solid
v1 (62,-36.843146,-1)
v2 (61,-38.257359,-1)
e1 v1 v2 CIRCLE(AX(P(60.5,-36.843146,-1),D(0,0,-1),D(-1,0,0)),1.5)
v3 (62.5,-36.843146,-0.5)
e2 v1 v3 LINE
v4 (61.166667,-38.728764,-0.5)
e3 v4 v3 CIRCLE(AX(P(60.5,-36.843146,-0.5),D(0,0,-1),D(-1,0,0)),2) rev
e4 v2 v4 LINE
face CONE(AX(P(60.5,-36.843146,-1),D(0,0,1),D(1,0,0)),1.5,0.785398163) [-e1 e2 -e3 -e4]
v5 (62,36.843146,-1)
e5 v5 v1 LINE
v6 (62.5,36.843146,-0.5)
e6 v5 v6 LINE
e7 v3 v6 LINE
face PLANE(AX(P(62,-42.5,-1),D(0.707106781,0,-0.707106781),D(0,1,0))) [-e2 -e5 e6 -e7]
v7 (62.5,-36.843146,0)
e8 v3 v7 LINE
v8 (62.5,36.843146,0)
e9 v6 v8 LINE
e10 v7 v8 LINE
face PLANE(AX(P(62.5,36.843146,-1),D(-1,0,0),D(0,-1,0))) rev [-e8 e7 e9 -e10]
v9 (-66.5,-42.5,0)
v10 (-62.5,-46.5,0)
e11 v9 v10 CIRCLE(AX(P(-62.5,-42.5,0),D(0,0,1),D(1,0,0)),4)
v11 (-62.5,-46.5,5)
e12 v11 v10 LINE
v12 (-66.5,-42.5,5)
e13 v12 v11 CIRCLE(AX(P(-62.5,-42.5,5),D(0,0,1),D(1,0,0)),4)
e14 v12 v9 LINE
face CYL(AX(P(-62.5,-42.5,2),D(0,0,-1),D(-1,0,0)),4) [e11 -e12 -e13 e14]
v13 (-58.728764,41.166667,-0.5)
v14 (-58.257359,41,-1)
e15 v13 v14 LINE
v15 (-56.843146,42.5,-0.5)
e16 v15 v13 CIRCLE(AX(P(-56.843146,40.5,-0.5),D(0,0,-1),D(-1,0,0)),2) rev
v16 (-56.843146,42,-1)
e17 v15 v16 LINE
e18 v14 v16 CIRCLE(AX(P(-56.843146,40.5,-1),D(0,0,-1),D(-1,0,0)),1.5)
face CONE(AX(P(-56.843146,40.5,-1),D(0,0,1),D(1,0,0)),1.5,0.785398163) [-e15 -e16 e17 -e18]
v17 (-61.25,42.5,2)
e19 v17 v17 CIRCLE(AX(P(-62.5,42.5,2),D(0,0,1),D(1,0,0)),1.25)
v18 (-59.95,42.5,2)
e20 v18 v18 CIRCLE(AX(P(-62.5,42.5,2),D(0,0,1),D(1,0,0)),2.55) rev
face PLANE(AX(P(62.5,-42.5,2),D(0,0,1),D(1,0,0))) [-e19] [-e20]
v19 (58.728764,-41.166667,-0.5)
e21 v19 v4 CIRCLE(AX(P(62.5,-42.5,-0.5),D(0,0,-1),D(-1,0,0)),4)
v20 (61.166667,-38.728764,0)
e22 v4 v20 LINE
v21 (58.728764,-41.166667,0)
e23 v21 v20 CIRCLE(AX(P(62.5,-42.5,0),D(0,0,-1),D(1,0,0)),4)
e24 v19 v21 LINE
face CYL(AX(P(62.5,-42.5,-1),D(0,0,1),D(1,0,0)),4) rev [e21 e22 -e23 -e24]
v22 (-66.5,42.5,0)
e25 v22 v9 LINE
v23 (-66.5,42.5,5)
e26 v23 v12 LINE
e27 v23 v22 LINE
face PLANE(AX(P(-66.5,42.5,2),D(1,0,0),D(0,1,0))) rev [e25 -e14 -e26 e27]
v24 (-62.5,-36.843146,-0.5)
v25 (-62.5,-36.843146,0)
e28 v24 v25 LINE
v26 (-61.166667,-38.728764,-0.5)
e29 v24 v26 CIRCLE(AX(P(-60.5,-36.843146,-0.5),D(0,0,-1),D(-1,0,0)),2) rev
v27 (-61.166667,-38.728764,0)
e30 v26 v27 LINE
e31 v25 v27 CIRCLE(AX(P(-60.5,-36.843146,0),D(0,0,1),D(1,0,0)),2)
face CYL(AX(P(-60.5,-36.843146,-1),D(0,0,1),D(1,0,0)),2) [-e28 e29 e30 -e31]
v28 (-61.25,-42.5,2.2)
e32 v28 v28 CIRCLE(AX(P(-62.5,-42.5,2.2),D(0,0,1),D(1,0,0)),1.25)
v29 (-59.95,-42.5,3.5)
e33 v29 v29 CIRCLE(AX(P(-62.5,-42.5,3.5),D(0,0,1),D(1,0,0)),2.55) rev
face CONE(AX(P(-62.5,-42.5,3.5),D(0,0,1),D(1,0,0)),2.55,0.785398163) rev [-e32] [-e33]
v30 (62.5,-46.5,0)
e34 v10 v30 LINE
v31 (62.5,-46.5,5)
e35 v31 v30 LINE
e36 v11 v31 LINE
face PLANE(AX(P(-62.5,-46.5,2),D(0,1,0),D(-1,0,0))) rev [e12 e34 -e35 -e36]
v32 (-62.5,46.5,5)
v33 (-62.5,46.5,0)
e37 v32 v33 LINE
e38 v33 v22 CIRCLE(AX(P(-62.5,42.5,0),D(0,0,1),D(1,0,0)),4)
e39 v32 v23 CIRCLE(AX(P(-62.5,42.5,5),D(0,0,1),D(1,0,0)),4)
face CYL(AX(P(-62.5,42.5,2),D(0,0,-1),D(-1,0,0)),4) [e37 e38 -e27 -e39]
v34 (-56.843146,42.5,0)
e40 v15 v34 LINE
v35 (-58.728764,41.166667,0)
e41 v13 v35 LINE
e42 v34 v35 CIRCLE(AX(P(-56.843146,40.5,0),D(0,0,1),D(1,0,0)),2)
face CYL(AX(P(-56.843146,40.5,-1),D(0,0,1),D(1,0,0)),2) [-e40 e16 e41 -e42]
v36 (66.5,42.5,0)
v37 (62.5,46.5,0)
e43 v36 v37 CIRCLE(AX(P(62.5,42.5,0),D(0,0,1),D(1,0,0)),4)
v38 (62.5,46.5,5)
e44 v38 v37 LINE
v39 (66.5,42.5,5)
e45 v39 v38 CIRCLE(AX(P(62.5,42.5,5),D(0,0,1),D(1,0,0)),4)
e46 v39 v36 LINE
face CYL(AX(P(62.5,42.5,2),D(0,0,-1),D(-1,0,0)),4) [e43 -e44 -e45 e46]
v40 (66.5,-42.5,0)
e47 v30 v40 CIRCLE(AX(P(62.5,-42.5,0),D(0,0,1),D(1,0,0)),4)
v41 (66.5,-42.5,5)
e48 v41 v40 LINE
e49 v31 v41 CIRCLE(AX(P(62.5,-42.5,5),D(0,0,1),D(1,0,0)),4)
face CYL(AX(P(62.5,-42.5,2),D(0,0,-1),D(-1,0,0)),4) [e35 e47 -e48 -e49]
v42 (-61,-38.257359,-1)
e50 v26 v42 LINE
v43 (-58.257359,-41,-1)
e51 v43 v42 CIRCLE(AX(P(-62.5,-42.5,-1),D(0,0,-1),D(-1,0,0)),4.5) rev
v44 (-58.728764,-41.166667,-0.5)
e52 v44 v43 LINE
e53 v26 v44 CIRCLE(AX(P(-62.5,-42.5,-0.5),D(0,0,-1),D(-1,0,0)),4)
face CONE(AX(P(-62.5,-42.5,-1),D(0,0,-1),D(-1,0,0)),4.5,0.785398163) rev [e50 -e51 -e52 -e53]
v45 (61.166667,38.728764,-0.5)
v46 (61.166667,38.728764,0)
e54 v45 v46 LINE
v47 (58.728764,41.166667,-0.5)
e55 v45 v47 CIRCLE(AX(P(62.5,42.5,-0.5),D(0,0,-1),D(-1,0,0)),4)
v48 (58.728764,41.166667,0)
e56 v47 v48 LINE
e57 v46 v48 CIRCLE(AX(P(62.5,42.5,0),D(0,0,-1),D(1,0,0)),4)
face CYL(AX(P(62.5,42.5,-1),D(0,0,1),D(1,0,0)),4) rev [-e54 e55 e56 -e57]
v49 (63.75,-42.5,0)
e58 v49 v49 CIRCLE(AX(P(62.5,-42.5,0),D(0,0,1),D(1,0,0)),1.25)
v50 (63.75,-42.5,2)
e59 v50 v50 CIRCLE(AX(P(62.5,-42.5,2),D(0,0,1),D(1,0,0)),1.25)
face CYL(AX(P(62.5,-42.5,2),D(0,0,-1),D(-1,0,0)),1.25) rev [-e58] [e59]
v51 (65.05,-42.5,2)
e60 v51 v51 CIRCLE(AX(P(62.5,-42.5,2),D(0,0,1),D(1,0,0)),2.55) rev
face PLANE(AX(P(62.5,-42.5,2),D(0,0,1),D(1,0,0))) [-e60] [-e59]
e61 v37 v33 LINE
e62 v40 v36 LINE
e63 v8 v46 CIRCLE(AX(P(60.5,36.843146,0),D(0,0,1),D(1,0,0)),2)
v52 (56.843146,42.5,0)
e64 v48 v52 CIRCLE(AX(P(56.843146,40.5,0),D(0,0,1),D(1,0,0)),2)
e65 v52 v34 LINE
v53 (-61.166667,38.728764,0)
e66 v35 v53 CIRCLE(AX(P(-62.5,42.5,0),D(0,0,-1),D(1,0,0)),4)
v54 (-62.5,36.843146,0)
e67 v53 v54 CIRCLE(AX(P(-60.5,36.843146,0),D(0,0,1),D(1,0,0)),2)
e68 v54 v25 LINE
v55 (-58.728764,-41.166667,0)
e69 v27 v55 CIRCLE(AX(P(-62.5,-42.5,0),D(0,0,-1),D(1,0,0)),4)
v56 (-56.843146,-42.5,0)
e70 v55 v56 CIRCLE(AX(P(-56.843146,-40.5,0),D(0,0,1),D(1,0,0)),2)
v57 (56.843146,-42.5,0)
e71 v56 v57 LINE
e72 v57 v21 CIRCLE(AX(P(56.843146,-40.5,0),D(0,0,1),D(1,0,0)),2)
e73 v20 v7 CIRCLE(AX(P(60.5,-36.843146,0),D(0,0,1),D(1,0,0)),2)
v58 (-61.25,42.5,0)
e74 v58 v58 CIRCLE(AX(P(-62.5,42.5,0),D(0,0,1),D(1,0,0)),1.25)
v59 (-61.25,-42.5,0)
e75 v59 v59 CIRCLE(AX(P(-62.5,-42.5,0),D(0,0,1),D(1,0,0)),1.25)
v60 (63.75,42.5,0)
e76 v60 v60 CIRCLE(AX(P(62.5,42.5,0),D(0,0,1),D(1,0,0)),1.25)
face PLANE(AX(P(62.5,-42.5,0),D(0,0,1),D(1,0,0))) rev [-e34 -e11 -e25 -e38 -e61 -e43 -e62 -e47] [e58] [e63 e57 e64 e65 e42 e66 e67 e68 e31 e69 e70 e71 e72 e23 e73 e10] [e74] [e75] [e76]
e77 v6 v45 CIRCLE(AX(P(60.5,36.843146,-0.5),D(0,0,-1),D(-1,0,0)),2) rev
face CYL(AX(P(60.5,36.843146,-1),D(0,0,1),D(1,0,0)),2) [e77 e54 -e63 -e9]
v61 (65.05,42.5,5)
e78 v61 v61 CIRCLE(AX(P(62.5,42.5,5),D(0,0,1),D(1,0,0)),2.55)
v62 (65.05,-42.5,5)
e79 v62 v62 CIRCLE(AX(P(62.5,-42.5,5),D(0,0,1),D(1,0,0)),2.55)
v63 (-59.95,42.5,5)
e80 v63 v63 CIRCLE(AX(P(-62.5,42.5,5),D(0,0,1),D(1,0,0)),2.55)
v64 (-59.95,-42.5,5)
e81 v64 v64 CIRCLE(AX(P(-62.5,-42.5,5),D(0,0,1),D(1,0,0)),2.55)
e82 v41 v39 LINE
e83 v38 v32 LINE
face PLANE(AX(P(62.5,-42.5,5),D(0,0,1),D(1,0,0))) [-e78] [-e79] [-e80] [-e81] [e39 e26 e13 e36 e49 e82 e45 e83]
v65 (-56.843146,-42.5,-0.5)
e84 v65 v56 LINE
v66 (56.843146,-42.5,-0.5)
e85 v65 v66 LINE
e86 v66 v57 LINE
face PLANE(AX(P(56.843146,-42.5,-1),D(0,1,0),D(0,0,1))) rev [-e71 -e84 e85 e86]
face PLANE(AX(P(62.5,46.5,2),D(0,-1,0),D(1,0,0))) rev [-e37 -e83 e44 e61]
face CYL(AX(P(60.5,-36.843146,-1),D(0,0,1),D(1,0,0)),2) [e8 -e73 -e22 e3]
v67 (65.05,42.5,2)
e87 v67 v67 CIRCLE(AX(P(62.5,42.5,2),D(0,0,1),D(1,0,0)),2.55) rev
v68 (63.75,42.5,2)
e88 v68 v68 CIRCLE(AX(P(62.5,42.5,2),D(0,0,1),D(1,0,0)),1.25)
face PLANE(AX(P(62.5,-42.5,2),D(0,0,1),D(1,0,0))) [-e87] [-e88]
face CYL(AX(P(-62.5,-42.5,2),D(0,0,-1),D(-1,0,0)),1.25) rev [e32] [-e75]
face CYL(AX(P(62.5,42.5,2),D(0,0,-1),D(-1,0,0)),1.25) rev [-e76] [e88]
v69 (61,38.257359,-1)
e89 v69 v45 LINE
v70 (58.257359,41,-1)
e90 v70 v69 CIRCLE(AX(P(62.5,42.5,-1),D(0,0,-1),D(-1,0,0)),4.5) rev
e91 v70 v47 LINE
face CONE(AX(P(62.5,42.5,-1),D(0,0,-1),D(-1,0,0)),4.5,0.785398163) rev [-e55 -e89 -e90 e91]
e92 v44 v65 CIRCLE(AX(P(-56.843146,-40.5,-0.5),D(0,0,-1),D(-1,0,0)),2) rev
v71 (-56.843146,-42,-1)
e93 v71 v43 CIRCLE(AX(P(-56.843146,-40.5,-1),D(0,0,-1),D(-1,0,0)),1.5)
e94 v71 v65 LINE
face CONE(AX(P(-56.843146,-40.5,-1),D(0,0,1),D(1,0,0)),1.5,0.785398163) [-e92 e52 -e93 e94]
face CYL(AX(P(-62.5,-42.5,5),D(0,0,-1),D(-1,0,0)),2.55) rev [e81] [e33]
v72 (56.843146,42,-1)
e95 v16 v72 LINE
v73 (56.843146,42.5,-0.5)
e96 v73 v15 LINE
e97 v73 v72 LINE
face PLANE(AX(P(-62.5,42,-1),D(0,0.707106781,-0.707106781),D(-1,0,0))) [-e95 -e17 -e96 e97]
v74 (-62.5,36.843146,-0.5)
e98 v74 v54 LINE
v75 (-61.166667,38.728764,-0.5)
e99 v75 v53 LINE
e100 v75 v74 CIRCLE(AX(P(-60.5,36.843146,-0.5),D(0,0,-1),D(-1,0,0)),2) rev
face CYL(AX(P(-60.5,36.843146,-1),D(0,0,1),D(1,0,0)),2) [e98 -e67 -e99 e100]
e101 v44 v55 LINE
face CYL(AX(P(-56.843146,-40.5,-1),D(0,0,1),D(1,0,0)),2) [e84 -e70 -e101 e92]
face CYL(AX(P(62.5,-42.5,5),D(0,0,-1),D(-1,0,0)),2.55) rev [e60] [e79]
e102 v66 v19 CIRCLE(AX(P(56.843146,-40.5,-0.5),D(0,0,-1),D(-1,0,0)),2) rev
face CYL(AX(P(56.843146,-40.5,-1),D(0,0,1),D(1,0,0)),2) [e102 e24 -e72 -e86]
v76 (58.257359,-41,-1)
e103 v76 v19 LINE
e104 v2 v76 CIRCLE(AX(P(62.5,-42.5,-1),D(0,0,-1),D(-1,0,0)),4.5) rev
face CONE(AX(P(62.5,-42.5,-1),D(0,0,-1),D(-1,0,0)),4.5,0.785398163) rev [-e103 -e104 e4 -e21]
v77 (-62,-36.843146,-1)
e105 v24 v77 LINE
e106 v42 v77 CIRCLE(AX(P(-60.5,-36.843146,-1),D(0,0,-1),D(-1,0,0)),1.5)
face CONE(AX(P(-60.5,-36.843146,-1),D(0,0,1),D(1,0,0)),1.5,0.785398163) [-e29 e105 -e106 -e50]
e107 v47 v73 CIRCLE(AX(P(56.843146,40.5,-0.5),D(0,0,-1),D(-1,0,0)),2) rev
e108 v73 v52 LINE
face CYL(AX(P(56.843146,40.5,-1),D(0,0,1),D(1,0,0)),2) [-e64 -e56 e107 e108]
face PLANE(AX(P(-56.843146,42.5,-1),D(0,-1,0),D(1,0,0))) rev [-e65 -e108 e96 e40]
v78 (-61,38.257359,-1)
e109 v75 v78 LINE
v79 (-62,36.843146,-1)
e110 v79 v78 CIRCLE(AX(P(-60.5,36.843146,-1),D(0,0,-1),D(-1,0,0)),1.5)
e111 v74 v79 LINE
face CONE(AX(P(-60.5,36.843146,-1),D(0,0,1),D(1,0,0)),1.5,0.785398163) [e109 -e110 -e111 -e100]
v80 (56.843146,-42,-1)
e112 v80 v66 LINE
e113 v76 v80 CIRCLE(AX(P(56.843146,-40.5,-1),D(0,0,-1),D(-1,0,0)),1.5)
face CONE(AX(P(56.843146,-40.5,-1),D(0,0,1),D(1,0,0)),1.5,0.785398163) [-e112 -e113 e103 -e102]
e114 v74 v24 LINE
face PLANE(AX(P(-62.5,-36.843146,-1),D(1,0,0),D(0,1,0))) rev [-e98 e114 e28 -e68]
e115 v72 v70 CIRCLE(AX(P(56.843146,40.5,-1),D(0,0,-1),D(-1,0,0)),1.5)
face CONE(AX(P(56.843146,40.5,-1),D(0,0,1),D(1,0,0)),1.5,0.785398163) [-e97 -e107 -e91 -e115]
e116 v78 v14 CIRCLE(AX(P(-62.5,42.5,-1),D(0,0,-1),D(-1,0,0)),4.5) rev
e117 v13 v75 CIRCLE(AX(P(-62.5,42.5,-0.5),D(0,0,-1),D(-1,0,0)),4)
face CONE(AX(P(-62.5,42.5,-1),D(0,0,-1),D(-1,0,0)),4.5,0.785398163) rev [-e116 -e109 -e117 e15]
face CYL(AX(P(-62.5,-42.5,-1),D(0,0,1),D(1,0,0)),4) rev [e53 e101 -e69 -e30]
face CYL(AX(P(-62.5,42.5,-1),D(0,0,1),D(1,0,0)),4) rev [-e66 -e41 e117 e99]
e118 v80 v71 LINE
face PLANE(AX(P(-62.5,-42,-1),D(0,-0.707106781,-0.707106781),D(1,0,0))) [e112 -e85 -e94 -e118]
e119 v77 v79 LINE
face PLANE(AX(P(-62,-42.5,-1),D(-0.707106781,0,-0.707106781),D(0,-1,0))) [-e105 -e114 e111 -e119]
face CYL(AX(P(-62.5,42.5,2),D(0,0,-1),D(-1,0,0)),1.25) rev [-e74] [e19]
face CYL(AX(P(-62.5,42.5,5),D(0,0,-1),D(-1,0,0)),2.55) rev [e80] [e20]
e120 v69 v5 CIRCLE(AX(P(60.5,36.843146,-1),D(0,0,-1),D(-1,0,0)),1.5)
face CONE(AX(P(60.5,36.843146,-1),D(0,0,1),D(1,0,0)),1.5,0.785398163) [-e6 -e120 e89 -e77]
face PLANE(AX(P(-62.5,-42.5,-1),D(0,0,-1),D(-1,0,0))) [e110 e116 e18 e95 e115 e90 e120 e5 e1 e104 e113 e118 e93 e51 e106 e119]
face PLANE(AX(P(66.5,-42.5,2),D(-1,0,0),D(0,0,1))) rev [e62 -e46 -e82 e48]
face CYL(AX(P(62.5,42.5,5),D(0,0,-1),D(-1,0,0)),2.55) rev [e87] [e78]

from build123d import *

# Parameters (mm, degrees)
SKETCH2_R           = 1.25
BOSS_EXTRUDE1_DEPTH = 2
SKETCH3_R           = 2.55
BOSS_EXTRUDE2_DEPTH = 3
BOSS_EXTRUDE3_START = 3
BOSS_EXTRUDE3_DEPTH = 3
CHAMFER1_SIZE       = 0.5
CHAMFER2_SIZE       = 1.5


with BuildPart() as part:
    # Sketch2 → Boss-Extrude1 (new body)
    with BuildSketch(Plane.XY):
        with BuildLine():
            Line((66.5, -42.5), (66.5, 42.5))
            ThreePointArc((66.5, 42.5), (65.328427125, 45.328427125), (62.5, 46.5))
            Line((62.5, 46.5), (-62.5, 46.5))
            ThreePointArc((-62.5, 46.5), (-65.328427125, 45.328427125), (-66.5, 42.5))
            Line((-66.5, 42.5), (-66.5, -42.5))
            ThreePointArc((-66.5, -42.5), (-65.328427125, -45.328427125), (-62.5, -46.5))
            Line((-62.5, -46.5), (62.5, -46.5))
            ThreePointArc((62.5, -46.5), (65.328427125, -45.328427125), (66.5, -42.5))
        make_face()
        with Locations((-62.5, 42.5)):
            Circle(SKETCH2_R, mode=Mode.SUBTRACT)
        with Locations((62.5, 42.5)):
            Circle(SKETCH2_R, mode=Mode.SUBTRACT)
        with Locations((-62.5, -42.5)):
            Circle(SKETCH2_R, mode=Mode.SUBTRACT)
        with Locations((62.5, -42.5)):
            Circle(SKETCH2_R, mode=Mode.SUBTRACT)
        with BuildLine():
            Line((-62.5, -36.843145751), (-62.5, 36.843145751))
            ThreePointArc((-62.5, 36.843145751), (-62.132993162, 37.997846289), (-61.166666667, 38.728763834))
            ThreePointArc((-61.166666667, 38.728763834), (-59.671572875, 39.671572875), (-58.728763834, 41.166666667))
            ThreePointArc((-58.728763834, 41.166666667), (-57.997846289, 42.132993162), (-56.843145751, 42.5))
            Line((-56.843145751, 42.5), (56.843145751, 42.5))
            ThreePointArc((56.843145751, 42.5), (57.997846289, 42.132993162), (58.728763834, 41.166666667))
            ThreePointArc((58.728763834, 41.166666667), (59.671572875, 39.671572875), (61.166666667, 38.728763834))
            ThreePointArc((61.166666667, 38.728763834), (62.132993162, 37.997846289), (62.5, 36.843145751))
            Line((62.5, 36.843145751), (62.5, -36.843145751))
            ThreePointArc((62.5, -36.843145751), (62.132993162, -37.997846289), (61.166666667, -38.728763834))
            ThreePointArc((61.166666667, -38.728763834), (59.671572875, -39.671572875), (58.728763834, -41.166666667))
            ThreePointArc((58.728763834, -41.166666667), (57.997846289, -42.132993162), (56.843145751, -42.5))
            Line((56.843145751, -42.5), (-56.843145751, -42.5))
            ThreePointArc((-56.843145751, -42.5), (-57.997846289, -42.132993162), (-58.728763834, -41.166666667))
            ThreePointArc((-58.728763834, -41.166666667), (-59.671572875, -39.671572875), (-61.166666667, -38.728763834))
            ThreePointArc((-61.166666667, -38.728763834), (-62.132993162, -37.997846289), (-62.5, -36.843145751))
        make_face(mode=Mode.SUBTRACT)
    extrude(amount=BOSS_EXTRUDE1_DEPTH)

    # Sketch3 → Boss-Extrude2 (add)
    with BuildSketch(Plane.XY.offset(2)):
        with BuildLine():
            Line((66.5, -42.5), (66.5, 42.5))
            ThreePointArc((66.5, 42.5), (65.328427125, 45.328427125), (62.5, 46.5))
            Line((62.5, 46.5), (-62.5, 46.5))
            ThreePointArc((-62.5, 46.5), (-65.328427125, 45.328427125), (-66.5, 42.5))
            Line((-66.5, 42.5), (-66.5, -42.5))
            ThreePointArc((-66.5, -42.5), (-65.328427125, -45.328427125), (-62.5, -46.5))
            Line((-62.5, -46.5), (62.5, -46.5))
            ThreePointArc((62.5, -46.5), (65.328427125, -45.328427125), (66.5, -42.5))
        make_face()
        with Locations((-62.5, 42.5)):
            Circle(SKETCH3_R, mode=Mode.SUBTRACT)
        with Locations((62.5, 42.5)):
            Circle(SKETCH3_R, mode=Mode.SUBTRACT)
        with Locations((62.5, -42.5)):
            Circle(SKETCH3_R, mode=Mode.SUBTRACT)
        with Locations((-62.5, -42.5)):
            Circle(SKETCH3_R, mode=Mode.SUBTRACT)
    extrude(amount=BOSS_EXTRUDE2_DEPTH)

    # Sketch4 → Boss-Extrude3 (add)
    with BuildSketch(Plane(origin=(0, 0, 2), x_dir=(-1, 0, 0), z_dir=(0, 0, -1)).offset(BOSS_EXTRUDE3_START)):
        with BuildLine():
            Line((62.5, -36.843145751), (62.5, 36.843145751))
            ThreePointArc((62.5, 36.843145751), (62.132993162, 37.997846289), (61.166666667, 38.728763834))
            ThreePointArc((61.166666667, 38.728763834), (59.671572875, 39.671572875), (58.728763834, 41.166666667))
            ThreePointArc((58.728763834, 41.166666667), (57.997846289, 42.132993162), (56.843145751, 42.5))
            Line((56.843145751, 42.5), (-56.843145751, 42.5))
            ThreePointArc((-56.843145751, 42.5), (-57.997846289, 42.132993162), (-58.728763834, 41.166666667))
            ThreePointArc((-58.728763834, 41.166666667), (-59.671572875, 39.671572875), (-61.166666667, 38.728763834))
            ThreePointArc((-61.166666667, 38.728763834), (-62.132993162, 37.997846289), (-62.5, 36.843145751))
            Line((-62.5, 36.843145751), (-62.5, -36.843145751))
            ThreePointArc((-62.5, -36.843145751), (-62.132993162, -37.997846289), (-61.166666667, -38.728763834))
            ThreePointArc((-61.166666667, -38.728763834), (-59.671572875, -39.671572875), (-58.728763834, -41.166666667))
            ThreePointArc((-58.728763834, -41.166666667), (-57.997846289, -42.132993162), (-56.843145751, -42.5))
            Line((-56.843145751, -42.5), (56.843145751, -42.5))
            ThreePointArc((56.843145751, -42.5), (57.997846289, -42.132993162), (58.728763834, -41.166666667))
            ThreePointArc((58.728763834, -41.166666667), (59.671572875, -39.671572875), (61.166666667, -38.728763834))
            ThreePointArc((61.166666667, -38.728763834), (62.132993162, -37.997846289), (62.5, -36.843145751))
        make_face()
    extrude(amount=-BOSS_EXTRUDE3_DEPTH)

    # Chamfer1
    chamfer1_edges = [part.edges().sort_by_distance(p)[0] for p in [
        (-59.671572875, -39.671572875, -1),
        (-62.132993162, -37.997846289, -1),
        (-62.5, 0, -1),
        (-62.132993162, 37.997846289, -1),
        (-59.671572875, 39.671572875, -1),
        (-57.997846289, 42.132993162, -1),
        (0, 42.5, -1),
        (57.997846289, 42.132993162, -1),
        (59.671572875, 39.671572875, -1),
        (62.132993162, 37.997846289, -1),
        (62.5, 0, -1),
        (62.132993162, -37.997846289, -1),
        (59.671572875, -39.671572875, -1),
        (57.997846289, -42.132993162, -1),
        (0, -42.5, -1),
        (-57.997846289, -42.132993162, -1),
    ]]
    chamfer(chamfer1_edges, length=CHAMFER1_SIZE)

    # Chamfer2
    # the kernel refuses this chamfer: 1.5 mm, written as the material it adds along each edge
    with BuildSketch(Plane(origin=(-62.5, -42.5, 2), x_dir=(1, 0, 0), z_dir=(0, -1, 0))) as chamfer2_piece_1_section:
        Polygon((2.55 - CHAMFER2_SIZE, 0), (2.55, CHAMFER2_SIZE), (2.55, 0), align=None)
    chamfer2_piece_1 = revolve(axis=Axis((-62.5, -42.5, 2), (0, 0, 1)), mode=Mode.PRIVATE)
    chamfer2_piece_1 = chamfer2_piece_1 - Plane(origin=(-62.5, -42.5, 2.85349357), x_dir=(1, 0, 0), z_dir=(0, 0, -1)) * Cylinder(1.25, 11, mode=Mode.PRIVATE)
    add(chamfer2_piece_1)


solid = part.part
